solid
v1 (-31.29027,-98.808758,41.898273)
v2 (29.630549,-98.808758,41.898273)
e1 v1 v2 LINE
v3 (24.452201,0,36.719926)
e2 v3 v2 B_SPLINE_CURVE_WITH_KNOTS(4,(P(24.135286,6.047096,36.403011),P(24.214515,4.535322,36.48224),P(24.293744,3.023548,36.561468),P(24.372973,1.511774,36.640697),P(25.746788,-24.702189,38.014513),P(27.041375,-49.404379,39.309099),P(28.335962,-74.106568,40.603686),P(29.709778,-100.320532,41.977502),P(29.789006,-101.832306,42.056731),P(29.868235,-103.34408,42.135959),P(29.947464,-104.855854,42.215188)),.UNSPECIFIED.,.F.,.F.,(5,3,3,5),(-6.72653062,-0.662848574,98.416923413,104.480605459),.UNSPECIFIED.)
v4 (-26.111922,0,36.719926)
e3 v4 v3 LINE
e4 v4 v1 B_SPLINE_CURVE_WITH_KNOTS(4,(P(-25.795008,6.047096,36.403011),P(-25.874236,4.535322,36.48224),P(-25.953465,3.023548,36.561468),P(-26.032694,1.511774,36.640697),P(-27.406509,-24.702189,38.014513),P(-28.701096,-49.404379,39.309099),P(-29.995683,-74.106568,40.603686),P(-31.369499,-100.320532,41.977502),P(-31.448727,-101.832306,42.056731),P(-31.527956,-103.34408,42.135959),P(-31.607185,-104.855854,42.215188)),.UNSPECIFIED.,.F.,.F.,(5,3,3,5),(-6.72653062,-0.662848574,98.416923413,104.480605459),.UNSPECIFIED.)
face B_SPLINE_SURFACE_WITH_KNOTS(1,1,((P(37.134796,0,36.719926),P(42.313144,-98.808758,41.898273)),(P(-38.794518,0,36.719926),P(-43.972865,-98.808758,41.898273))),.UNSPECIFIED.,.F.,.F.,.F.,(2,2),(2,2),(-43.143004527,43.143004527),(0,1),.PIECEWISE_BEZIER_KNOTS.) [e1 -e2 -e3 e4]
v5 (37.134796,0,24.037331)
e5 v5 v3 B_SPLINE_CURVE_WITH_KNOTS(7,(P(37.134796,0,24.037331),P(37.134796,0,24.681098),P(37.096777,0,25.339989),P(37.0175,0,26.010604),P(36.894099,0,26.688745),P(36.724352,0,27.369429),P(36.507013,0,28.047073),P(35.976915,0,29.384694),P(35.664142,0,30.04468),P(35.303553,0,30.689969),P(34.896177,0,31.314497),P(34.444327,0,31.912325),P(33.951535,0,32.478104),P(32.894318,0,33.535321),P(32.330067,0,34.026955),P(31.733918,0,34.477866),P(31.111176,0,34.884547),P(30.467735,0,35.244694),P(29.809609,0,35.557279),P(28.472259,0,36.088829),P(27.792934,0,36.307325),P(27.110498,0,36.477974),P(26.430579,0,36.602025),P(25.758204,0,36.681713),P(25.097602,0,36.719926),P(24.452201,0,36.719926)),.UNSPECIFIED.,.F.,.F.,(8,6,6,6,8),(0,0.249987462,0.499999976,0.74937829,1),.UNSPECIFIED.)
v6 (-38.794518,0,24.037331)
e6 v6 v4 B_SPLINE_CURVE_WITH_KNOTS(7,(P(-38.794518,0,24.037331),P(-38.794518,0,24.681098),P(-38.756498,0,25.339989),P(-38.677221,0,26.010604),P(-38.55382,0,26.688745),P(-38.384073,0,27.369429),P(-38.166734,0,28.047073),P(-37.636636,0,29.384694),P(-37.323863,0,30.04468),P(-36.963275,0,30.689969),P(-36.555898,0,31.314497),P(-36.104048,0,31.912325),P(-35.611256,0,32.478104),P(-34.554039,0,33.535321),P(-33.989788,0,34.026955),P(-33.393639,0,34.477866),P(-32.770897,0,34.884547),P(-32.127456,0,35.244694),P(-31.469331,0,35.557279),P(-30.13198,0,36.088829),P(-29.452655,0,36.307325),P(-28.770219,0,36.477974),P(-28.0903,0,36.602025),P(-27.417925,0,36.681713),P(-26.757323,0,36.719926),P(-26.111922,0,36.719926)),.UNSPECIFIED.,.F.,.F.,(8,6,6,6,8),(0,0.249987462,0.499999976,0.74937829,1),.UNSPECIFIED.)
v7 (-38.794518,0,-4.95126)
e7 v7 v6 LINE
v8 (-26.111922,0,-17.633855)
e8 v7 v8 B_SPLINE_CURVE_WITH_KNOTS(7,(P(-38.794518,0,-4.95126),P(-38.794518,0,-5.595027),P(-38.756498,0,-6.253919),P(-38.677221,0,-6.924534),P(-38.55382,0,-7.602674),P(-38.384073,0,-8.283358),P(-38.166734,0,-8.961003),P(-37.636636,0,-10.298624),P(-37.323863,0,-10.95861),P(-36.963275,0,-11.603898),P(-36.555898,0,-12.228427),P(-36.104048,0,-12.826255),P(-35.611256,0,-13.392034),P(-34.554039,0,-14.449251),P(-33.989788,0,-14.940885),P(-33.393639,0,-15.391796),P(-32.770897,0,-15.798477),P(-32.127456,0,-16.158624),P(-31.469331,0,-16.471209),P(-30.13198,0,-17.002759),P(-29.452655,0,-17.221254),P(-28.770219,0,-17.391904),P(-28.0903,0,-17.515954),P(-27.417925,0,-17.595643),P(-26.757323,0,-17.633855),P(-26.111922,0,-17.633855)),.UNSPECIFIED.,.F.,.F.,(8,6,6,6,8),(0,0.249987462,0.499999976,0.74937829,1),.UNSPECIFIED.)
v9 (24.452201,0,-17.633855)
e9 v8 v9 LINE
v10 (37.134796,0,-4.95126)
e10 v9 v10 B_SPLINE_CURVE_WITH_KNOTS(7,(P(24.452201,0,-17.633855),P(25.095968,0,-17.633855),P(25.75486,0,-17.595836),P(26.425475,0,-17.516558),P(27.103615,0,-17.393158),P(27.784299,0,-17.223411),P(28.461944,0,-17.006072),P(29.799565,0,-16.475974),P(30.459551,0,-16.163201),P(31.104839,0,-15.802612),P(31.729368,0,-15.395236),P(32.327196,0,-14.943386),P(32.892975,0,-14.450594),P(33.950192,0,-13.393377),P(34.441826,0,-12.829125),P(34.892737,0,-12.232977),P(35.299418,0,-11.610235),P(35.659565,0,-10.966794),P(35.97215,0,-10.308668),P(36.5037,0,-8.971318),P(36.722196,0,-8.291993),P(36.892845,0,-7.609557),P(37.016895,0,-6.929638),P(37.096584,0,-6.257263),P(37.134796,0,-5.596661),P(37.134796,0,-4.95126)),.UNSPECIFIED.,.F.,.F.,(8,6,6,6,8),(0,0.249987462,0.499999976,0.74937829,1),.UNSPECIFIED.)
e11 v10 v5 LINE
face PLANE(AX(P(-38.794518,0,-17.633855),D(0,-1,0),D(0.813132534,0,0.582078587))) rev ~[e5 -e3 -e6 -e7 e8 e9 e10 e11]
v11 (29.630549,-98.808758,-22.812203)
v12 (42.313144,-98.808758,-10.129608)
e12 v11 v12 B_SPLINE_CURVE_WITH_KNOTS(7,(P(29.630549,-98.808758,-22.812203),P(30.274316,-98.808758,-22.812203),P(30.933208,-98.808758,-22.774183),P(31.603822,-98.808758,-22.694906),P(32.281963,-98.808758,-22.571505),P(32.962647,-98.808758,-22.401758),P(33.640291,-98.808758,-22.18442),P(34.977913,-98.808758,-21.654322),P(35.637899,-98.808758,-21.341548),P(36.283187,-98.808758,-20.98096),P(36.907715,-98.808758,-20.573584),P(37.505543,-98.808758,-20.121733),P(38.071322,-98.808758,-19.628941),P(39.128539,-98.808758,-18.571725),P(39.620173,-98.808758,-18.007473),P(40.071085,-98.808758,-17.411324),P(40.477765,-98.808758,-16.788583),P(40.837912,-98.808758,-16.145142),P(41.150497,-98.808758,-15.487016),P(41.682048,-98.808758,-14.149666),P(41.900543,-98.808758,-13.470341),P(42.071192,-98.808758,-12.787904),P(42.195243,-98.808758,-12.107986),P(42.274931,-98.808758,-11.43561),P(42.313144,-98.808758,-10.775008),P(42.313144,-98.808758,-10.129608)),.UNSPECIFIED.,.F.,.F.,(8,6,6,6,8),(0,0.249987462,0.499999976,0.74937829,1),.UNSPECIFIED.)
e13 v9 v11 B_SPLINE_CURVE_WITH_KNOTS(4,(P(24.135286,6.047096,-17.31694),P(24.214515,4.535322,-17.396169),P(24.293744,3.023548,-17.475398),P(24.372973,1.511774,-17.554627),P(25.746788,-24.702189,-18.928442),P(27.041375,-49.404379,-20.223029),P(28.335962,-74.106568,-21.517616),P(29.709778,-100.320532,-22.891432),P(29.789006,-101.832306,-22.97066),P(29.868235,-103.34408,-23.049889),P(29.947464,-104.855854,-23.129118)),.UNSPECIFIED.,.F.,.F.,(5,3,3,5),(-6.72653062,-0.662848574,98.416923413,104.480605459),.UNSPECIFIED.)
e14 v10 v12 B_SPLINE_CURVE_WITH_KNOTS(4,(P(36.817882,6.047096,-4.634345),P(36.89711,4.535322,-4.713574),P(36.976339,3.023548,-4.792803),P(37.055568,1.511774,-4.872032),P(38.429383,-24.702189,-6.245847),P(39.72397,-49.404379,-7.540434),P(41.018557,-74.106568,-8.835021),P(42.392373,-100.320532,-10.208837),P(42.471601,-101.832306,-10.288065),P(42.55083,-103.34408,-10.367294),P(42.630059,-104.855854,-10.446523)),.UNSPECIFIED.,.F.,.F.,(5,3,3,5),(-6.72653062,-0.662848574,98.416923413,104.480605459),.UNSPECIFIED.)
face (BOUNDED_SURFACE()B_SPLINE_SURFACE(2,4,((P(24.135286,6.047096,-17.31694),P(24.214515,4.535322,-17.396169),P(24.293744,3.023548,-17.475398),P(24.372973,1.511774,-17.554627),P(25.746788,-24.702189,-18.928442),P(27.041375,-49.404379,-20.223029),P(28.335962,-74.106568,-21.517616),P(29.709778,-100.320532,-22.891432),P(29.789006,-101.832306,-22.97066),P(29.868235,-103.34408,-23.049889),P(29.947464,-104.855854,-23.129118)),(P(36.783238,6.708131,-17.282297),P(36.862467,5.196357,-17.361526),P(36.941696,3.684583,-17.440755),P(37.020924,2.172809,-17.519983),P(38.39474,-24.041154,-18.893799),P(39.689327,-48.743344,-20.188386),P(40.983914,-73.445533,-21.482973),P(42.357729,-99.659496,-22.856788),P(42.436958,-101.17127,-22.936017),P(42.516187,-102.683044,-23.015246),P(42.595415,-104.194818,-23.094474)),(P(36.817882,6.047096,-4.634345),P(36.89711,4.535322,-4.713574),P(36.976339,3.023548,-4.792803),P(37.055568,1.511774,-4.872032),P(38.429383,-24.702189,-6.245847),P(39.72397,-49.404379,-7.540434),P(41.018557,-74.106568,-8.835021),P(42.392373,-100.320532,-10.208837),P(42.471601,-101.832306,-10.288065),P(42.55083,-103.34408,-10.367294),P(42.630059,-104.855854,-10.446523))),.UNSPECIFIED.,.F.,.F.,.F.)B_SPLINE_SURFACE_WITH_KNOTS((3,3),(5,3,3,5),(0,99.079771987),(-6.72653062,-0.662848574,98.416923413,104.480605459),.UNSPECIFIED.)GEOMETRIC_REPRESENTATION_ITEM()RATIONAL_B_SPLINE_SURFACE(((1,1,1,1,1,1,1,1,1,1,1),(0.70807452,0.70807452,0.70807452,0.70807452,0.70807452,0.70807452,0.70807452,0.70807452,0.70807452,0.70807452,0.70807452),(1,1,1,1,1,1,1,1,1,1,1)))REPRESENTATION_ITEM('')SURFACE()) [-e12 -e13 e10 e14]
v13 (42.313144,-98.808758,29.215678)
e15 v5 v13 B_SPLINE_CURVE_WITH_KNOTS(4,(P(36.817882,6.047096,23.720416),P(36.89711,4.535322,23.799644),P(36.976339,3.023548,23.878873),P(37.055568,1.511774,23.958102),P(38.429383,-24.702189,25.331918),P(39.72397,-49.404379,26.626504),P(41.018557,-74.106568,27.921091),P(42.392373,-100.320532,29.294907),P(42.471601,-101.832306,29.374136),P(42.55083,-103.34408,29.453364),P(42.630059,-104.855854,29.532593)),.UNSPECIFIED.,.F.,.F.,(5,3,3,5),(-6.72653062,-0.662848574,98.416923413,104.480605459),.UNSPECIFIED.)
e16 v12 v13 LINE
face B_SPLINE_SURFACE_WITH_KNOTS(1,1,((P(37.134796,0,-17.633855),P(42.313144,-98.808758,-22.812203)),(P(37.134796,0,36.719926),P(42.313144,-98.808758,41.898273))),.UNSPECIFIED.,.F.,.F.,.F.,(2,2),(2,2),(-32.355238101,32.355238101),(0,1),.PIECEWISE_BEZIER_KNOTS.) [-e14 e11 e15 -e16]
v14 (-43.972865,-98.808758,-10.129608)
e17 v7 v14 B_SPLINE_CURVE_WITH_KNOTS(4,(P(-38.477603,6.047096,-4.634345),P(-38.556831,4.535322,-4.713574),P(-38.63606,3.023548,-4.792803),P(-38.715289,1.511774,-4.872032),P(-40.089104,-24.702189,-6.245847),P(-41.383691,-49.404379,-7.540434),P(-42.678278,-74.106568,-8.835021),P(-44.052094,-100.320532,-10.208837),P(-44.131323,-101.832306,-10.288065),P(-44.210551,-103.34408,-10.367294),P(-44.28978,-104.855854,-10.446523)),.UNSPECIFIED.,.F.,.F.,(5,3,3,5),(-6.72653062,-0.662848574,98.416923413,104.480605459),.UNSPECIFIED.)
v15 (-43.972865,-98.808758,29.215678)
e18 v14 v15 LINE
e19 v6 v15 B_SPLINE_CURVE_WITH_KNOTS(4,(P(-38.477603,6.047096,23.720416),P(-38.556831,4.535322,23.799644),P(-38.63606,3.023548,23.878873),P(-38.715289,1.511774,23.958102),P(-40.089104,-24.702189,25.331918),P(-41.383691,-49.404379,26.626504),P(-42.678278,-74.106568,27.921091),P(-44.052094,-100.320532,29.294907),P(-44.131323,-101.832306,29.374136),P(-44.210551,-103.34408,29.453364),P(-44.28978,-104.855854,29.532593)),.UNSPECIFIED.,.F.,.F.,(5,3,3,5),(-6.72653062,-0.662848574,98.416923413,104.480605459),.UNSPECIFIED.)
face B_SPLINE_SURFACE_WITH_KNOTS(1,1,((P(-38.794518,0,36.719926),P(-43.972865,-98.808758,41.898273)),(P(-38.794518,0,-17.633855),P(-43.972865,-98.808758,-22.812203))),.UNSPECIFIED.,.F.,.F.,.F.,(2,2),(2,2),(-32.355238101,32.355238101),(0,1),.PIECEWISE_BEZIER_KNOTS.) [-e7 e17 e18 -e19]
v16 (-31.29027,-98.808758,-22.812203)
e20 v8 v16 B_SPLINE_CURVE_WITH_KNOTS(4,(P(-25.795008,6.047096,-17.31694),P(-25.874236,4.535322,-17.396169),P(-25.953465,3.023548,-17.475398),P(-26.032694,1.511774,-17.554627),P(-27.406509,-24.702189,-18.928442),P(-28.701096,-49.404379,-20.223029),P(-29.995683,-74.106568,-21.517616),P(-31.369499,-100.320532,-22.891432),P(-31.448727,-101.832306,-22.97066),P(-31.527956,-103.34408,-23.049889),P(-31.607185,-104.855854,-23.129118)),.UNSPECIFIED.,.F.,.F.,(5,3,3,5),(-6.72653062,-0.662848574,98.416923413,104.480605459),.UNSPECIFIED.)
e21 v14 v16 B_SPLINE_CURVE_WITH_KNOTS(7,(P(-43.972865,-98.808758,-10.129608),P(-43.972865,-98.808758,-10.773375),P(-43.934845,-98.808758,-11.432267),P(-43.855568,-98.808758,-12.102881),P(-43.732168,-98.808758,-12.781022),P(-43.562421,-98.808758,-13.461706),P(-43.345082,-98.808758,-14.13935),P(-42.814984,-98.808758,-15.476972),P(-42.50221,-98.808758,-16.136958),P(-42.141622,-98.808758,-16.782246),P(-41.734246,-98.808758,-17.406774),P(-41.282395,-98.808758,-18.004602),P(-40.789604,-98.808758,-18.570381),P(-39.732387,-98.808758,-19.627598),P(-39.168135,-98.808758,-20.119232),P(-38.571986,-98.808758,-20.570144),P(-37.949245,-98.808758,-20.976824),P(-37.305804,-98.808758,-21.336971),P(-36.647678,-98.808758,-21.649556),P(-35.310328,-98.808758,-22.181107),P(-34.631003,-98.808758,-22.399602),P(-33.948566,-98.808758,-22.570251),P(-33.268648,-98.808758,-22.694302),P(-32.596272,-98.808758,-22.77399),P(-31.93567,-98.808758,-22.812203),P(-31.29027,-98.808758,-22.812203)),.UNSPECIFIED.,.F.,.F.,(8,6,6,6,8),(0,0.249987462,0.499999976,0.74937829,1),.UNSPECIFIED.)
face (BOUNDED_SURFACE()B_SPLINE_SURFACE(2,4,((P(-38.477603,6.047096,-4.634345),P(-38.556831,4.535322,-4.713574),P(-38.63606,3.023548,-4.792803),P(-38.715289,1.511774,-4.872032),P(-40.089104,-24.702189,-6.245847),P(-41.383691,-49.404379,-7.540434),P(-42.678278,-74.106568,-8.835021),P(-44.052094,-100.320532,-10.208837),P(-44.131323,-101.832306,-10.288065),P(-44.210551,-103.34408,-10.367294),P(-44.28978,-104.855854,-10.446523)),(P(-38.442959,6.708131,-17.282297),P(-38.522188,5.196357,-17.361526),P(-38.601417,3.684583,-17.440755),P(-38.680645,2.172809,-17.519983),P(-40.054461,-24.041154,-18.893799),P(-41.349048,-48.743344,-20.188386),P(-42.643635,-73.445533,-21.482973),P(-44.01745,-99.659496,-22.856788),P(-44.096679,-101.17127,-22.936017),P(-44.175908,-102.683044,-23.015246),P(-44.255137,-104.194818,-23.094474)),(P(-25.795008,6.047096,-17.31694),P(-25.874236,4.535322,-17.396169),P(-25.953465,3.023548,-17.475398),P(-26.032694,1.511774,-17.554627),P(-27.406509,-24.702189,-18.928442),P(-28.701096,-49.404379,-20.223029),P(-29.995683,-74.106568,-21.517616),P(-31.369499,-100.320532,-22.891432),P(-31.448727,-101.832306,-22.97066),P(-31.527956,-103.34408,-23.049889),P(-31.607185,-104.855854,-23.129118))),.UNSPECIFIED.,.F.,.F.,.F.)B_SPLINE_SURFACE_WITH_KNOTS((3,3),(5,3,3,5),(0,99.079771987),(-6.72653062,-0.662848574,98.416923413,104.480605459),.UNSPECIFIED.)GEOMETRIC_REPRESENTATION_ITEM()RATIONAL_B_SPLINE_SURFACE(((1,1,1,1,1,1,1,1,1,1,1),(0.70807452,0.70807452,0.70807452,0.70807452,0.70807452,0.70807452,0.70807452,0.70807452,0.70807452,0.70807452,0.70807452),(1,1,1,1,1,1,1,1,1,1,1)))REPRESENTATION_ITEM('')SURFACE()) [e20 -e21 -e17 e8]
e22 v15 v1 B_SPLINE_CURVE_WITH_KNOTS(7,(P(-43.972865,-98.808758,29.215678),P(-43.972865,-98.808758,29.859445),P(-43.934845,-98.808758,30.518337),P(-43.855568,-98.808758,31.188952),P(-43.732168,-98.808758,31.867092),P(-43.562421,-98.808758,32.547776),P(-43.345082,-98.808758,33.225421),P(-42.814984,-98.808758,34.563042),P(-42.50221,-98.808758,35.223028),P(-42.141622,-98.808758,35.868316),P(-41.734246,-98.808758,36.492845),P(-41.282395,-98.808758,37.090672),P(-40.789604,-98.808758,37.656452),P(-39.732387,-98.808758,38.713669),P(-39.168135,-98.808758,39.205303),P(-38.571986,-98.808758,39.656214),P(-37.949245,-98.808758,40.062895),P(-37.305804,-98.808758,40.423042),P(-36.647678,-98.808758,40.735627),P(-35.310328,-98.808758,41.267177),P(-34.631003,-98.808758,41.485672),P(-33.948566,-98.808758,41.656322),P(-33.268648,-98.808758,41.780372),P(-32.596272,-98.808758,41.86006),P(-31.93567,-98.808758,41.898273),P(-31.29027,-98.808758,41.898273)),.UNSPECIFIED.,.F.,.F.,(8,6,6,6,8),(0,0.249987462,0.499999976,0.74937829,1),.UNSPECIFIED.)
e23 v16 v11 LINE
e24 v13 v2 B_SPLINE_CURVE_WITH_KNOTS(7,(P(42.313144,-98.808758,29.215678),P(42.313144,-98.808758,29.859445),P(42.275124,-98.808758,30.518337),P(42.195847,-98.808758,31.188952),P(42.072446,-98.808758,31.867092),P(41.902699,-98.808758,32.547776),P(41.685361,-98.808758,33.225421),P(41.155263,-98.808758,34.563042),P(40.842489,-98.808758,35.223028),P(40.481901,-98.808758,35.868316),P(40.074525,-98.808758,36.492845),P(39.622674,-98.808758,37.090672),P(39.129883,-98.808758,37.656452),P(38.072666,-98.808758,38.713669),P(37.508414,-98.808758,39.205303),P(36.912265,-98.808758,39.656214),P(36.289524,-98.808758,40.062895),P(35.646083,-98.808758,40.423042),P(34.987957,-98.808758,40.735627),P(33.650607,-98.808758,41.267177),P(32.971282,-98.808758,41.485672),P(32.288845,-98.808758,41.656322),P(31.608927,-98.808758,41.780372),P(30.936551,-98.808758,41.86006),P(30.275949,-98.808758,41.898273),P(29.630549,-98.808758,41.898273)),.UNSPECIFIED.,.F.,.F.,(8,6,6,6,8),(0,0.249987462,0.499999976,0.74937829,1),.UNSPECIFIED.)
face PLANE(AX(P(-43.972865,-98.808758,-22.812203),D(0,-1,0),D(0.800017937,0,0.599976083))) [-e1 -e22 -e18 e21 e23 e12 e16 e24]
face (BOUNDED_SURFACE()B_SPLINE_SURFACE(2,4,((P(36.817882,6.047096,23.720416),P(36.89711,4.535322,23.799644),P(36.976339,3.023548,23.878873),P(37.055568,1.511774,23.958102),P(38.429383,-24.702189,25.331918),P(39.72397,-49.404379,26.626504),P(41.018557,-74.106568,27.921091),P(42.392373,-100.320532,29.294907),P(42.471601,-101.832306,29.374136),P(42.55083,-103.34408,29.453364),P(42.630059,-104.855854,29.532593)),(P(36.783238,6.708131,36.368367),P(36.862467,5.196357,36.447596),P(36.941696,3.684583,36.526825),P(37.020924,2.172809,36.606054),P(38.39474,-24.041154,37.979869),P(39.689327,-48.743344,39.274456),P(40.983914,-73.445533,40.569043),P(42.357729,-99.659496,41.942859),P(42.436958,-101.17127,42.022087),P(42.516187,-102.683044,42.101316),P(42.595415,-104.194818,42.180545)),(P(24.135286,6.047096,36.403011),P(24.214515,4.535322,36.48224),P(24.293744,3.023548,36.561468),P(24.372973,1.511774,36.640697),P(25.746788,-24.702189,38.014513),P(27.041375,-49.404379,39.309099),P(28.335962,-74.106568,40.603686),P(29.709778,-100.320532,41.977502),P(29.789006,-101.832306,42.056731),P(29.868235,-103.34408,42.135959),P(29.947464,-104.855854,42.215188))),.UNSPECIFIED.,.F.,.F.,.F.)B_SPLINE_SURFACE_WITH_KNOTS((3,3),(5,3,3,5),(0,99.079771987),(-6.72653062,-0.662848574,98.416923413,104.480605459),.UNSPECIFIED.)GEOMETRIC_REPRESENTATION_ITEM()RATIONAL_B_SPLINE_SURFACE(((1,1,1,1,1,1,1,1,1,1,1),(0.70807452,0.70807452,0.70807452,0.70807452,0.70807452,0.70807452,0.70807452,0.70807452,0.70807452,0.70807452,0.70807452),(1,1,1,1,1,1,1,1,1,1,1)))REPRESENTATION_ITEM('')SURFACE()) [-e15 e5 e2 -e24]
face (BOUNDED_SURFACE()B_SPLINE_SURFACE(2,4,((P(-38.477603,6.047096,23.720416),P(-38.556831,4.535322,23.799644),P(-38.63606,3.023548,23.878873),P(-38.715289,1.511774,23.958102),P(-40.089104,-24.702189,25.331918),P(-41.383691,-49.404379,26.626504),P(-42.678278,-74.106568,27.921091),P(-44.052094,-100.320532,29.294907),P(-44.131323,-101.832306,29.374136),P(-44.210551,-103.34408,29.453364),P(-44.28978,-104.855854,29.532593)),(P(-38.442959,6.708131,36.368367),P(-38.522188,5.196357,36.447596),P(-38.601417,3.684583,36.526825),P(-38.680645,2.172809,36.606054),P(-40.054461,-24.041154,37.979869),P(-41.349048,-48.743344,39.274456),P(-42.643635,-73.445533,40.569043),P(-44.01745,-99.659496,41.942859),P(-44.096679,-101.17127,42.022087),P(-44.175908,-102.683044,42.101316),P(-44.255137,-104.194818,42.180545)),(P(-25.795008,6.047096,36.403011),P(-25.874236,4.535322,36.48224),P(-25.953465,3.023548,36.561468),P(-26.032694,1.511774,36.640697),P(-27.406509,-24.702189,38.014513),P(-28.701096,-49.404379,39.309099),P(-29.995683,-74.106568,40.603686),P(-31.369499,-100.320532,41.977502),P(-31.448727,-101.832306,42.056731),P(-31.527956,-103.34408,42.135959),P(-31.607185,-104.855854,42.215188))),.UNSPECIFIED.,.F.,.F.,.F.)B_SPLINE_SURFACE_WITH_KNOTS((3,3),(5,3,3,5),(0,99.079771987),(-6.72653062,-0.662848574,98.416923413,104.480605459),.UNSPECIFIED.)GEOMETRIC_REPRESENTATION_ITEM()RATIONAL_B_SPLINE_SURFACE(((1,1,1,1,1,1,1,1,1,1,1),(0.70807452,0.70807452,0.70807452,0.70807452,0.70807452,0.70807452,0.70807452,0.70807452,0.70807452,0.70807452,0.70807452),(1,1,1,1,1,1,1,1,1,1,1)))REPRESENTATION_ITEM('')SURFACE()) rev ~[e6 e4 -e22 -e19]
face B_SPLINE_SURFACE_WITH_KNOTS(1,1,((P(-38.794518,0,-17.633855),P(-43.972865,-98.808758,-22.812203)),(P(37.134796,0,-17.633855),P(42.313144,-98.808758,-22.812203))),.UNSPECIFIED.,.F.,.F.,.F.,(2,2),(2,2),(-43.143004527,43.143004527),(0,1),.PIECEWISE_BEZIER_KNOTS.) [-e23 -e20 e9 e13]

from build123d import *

# Parameters (mm, degrees)
F0_W     = 75.9293138981
F0_H     = 54.3537810445
F1_DEPTH = 98.8087579608
F1_TAPER = -3
F2_R     = 12.7


with BuildPart() as f1:
    # F0 (on Front) → F1 (new body)
    with BuildSketch(Plane.XZ):
        with Locations((-0.829860568, 9.5430351794)):
            Rectangle(F0_W, F0_H)
    extrude(amount=F1_DEPTH, taper=F1_TAPER)

    # F2
    f2_edges = [f1.edges().sort_by_distance(p)[0] for p in [
        (39.72397, -49.404379, 39.309099),
        (-41.383691, -49.404379, 39.309099),
        (39.72397, -49.404379, -20.223029),
        (-41.383691, -49.404379, -20.223029),
    ]]
    fillet(f2_edges, radius=F2_R)


solid = f1.part
